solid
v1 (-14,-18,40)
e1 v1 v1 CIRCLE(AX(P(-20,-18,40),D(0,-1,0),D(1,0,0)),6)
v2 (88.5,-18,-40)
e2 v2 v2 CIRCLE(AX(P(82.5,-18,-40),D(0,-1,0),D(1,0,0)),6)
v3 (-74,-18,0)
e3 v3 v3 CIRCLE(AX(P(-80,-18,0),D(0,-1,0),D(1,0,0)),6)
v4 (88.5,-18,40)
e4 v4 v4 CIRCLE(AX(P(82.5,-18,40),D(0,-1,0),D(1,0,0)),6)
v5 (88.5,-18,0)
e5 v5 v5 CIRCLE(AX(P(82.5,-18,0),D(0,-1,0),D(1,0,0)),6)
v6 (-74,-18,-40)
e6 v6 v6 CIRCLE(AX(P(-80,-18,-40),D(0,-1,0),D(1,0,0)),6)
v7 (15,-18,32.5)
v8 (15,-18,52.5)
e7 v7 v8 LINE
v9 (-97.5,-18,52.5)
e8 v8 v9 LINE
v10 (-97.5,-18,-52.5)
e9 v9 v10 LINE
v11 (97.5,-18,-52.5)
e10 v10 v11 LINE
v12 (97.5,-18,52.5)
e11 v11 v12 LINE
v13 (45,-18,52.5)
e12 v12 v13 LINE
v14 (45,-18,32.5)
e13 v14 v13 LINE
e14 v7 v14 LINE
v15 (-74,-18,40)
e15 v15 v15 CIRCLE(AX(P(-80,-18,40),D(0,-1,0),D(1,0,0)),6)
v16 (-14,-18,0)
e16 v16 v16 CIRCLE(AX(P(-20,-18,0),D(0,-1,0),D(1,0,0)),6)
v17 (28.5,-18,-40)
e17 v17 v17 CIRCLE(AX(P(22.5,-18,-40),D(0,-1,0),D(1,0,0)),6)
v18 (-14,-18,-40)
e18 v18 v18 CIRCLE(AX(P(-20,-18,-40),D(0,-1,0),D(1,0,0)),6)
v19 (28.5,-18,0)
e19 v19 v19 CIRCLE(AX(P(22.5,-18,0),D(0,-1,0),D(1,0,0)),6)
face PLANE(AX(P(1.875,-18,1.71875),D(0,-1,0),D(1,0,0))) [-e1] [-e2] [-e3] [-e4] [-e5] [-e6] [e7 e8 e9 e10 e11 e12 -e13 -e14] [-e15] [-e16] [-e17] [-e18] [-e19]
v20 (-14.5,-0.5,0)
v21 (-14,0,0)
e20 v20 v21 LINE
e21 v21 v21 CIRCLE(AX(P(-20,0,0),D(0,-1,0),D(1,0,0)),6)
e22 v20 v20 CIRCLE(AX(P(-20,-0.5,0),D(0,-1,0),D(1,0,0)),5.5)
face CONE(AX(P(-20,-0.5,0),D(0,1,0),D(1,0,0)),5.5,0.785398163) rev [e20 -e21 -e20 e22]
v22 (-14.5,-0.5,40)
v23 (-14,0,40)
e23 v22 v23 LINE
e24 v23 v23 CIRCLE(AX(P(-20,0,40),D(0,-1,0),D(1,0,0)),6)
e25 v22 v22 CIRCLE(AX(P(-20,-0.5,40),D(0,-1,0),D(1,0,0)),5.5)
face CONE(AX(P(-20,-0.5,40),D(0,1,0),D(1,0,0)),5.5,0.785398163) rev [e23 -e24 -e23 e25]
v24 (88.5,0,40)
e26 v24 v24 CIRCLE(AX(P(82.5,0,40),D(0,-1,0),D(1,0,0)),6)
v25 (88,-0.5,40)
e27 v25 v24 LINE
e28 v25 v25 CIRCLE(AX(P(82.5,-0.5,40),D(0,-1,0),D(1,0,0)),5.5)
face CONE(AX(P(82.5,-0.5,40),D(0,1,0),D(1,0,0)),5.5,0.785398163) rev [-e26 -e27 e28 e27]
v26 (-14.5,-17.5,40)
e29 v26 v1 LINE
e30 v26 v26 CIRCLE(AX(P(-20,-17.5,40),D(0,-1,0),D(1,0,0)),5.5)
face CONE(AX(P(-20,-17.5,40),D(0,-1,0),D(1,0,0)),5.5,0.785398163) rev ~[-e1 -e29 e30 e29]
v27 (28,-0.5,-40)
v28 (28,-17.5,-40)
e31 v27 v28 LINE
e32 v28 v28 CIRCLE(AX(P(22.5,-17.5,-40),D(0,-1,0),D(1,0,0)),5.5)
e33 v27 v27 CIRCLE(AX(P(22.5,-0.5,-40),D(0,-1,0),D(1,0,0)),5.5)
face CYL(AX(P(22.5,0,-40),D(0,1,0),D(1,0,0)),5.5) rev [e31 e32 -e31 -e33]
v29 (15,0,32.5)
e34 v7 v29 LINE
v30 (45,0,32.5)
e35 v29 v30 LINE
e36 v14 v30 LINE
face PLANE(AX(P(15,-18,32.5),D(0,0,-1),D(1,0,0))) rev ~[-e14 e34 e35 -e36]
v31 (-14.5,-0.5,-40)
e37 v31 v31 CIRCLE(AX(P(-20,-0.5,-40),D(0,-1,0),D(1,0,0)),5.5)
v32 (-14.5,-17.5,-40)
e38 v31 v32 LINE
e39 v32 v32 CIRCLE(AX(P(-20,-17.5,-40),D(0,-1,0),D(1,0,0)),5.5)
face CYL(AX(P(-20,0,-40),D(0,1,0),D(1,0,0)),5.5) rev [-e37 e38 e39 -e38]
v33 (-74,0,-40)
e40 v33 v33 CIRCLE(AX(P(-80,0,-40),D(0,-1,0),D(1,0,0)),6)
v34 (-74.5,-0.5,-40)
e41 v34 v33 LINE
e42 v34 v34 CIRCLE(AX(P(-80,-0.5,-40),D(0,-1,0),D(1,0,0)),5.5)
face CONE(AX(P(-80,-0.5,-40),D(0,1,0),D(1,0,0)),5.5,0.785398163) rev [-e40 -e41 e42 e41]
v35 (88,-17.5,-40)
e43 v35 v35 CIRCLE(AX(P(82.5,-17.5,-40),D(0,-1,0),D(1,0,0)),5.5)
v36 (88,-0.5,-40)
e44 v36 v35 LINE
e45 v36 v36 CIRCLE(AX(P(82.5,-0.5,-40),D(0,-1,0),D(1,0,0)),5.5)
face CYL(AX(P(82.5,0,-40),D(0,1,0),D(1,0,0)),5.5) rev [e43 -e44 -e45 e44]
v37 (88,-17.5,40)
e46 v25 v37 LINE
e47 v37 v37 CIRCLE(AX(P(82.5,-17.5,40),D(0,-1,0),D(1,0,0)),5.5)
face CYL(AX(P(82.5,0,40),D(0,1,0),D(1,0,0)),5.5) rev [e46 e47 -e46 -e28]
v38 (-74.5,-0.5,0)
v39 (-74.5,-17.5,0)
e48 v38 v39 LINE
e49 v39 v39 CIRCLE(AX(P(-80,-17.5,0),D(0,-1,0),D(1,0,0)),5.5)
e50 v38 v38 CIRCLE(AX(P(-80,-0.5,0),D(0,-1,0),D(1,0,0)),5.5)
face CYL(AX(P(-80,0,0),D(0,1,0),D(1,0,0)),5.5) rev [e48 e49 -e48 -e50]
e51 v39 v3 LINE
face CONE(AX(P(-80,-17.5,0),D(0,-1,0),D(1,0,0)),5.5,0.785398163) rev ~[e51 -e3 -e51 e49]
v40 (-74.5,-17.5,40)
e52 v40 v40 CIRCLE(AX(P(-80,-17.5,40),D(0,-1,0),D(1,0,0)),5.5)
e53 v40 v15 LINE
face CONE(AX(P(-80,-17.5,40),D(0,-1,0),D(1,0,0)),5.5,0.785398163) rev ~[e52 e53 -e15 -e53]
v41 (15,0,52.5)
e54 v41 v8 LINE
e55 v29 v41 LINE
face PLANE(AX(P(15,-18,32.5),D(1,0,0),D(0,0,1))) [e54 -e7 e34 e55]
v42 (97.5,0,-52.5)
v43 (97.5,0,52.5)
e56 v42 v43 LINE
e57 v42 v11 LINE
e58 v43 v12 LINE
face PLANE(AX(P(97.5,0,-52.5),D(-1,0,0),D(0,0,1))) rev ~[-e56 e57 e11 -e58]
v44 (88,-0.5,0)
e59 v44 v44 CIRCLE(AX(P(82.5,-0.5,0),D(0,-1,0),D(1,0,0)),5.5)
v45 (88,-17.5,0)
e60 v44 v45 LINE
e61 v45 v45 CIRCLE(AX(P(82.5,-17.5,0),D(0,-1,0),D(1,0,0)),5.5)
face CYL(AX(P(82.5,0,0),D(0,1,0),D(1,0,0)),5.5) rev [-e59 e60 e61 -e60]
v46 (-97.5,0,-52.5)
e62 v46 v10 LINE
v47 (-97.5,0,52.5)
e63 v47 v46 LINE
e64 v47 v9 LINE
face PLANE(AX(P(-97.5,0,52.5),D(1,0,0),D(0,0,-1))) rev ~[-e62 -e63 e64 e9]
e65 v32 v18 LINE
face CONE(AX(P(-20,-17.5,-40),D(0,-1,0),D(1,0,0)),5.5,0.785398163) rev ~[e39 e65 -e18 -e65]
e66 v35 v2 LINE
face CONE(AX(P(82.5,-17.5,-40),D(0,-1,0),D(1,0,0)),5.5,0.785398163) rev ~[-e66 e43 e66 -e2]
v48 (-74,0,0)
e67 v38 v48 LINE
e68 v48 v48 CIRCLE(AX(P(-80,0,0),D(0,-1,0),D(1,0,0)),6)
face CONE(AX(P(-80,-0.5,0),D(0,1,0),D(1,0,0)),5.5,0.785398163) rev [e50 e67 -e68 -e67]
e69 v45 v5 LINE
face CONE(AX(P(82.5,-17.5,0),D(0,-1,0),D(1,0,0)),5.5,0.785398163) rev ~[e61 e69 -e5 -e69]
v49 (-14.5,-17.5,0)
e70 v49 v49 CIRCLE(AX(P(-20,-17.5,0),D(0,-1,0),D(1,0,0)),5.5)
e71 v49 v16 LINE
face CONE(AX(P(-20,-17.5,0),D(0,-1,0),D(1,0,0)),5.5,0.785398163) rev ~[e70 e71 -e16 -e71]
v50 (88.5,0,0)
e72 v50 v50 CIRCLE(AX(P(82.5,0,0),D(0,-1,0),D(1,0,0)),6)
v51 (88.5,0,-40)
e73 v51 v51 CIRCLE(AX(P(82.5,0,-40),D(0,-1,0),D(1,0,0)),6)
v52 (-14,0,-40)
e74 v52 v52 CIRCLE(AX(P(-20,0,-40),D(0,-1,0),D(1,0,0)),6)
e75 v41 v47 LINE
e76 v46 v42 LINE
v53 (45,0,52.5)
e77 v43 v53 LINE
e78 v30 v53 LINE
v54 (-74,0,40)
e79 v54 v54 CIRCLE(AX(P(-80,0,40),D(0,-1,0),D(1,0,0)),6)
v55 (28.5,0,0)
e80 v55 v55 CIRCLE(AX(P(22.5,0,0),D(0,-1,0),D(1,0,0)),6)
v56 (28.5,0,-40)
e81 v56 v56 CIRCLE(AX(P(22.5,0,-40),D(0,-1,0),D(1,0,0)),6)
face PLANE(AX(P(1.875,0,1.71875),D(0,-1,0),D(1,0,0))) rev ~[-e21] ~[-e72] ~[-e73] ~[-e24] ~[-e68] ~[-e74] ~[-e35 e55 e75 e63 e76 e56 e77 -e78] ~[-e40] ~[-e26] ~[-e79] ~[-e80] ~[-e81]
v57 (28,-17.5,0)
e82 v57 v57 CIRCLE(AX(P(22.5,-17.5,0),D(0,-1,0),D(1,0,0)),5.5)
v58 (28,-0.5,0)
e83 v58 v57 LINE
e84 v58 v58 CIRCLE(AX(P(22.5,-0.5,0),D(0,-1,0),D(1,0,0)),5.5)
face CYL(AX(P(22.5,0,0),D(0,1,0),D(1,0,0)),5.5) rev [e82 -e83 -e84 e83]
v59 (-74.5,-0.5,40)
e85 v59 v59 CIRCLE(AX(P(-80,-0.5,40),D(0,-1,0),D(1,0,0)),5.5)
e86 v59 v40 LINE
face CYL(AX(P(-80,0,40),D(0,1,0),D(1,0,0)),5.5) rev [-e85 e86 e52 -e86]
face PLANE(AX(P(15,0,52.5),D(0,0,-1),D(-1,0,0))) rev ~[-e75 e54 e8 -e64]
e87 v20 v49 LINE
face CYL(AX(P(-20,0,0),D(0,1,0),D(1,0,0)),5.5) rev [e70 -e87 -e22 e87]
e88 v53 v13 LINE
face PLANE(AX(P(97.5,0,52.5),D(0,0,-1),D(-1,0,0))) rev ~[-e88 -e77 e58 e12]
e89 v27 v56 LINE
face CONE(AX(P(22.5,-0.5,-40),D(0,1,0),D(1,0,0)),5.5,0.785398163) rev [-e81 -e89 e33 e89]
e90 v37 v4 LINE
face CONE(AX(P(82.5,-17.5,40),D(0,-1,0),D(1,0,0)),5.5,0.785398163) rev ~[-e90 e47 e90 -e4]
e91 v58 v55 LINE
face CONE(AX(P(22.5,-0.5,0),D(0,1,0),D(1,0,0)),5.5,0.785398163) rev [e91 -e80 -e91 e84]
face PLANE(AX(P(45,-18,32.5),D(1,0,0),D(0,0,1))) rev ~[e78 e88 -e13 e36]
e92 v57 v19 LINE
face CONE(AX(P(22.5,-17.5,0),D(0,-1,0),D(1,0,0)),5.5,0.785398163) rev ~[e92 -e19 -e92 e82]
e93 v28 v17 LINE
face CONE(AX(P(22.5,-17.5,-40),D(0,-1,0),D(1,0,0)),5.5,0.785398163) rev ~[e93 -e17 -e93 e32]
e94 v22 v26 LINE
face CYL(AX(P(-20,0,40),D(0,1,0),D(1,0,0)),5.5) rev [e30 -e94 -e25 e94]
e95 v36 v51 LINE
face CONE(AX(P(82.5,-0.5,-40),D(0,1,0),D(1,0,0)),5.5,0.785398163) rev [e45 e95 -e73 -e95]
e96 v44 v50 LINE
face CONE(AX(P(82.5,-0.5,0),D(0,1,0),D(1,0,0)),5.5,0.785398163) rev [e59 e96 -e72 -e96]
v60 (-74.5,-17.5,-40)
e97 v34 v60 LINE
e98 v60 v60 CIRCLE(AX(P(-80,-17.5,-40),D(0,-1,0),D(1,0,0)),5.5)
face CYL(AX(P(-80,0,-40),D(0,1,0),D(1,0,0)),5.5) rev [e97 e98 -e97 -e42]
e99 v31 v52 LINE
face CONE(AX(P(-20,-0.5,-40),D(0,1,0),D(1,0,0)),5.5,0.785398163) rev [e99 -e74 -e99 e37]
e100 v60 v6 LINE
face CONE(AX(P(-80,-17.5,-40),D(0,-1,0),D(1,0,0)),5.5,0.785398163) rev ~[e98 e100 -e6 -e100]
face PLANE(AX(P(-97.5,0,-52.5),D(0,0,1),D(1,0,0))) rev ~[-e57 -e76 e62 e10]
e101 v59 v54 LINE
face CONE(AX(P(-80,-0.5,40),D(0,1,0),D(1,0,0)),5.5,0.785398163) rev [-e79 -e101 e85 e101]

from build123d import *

# Parameters (mm, degrees)
F0_R     = 5.5
F0_W     = 30
F0_H     = 59.6731263399
F0_H_2   = 20
F1_DEPTH = 18
F2_SIZE  = 0.5
F3_W     = 30
F3_H     = 79.6731263399
F4_DEPTH = 25


with BuildPart() as f1:
    # F0 (on Front) → F1 (new body)
    with BuildSketch(Plane.XZ):
        Polygon((-97.5, 52.5), (-97.5, -52.5), (97.5, -52.5), (97.5, 52.5), (45, 52.5), (45, 32.5), (15, 32.5), (15, 52.5), align=None)
        with Locations((-80, -40)):
            Circle(F0_R, mode=Mode.SUBTRACT)
        with Locations((-20, -40)):
            Circle(F0_R, mode=Mode.SUBTRACT)
        with Locations((-80, 0)):
            Circle(F0_R, mode=Mode.SUBTRACT)
        with Locations((-20, 0)):
            Circle(F0_R, mode=Mode.SUBTRACT)
        with Locations((22.5, -40)):
            Circle(F0_R, mode=Mode.SUBTRACT)
        with Locations((82.5, -40)):
            Circle(F0_R, mode=Mode.SUBTRACT)
        with Locations((22.5, 0)):
            Circle(F0_R, mode=Mode.SUBTRACT)
        with Locations((82.5, 0)):
            Circle(F0_R, mode=Mode.SUBTRACT)
        with Locations((-80, 40)):
            Circle(F0_R, mode=Mode.SUBTRACT)
        with Locations((-20, 40)):
            Circle(F0_R, mode=Mode.SUBTRACT)
        with Locations((82.5, 40)):
            Circle(F0_R, mode=Mode.SUBTRACT)
        with Locations((30, 82.33656317)):
            Rectangle(F0_W, F0_H)
        with Locations((30, 42.5)):
            Rectangle(F0_W, F0_H_2)
    extrude(amount=F1_DEPTH)

    # F2
    f2_edges = [f1.edges().sort_by_distance(p)[0] for p in [
        (-74.5, -9, 40),
        (-85.5, 0, 40),
        (-85.5, -18, 40),
        (-74.5, -9, 0),
        (-85.5, 0, 0),
        (-85.5, -18, 0),
        (-74.5, -9, -40),
        (-85.5, 0, -40),
        (-85.5, -18, -40),
        (-14.5, -9, 40),
        (-25.5, 0, 40),
        (-25.5, -18, 40),
        (-14.5, -9, 0),
        (-25.5, 0, 0),
        (-25.5, -18, 0),
        (-14.5, -9, -40),
        (-25.5, 0, -40),
        (-25.5, -18, -40),
        (28, -9, 0),
        (17, 0, 0),
        (17, -18, 0),
        (28, -9, -40),
        (17, 0, -40),
        (17, -18, -40),
        (88, -9, 40),
        (77, 0, 40),
        (77, -18, 40),
        (88, -9, 0),
        (77, 0, 0),
        (77, -18, 0),
        (88, -9, -40),
        (77, 0, -40),
        (77, -18, -40),
    ]]
    chamfer(f2_edges, length=F2_SIZE)

    # F3 (on face) → F4 (cut)
    with BuildSketch(Plane.XZ.offset(18)):
        with Locations((30, 72.33656317)):
            Rectangle(F3_W, F3_H)
    extrude(amount=-F4_DEPTH, mode=Mode.SUBTRACT)


solid = f1.part
